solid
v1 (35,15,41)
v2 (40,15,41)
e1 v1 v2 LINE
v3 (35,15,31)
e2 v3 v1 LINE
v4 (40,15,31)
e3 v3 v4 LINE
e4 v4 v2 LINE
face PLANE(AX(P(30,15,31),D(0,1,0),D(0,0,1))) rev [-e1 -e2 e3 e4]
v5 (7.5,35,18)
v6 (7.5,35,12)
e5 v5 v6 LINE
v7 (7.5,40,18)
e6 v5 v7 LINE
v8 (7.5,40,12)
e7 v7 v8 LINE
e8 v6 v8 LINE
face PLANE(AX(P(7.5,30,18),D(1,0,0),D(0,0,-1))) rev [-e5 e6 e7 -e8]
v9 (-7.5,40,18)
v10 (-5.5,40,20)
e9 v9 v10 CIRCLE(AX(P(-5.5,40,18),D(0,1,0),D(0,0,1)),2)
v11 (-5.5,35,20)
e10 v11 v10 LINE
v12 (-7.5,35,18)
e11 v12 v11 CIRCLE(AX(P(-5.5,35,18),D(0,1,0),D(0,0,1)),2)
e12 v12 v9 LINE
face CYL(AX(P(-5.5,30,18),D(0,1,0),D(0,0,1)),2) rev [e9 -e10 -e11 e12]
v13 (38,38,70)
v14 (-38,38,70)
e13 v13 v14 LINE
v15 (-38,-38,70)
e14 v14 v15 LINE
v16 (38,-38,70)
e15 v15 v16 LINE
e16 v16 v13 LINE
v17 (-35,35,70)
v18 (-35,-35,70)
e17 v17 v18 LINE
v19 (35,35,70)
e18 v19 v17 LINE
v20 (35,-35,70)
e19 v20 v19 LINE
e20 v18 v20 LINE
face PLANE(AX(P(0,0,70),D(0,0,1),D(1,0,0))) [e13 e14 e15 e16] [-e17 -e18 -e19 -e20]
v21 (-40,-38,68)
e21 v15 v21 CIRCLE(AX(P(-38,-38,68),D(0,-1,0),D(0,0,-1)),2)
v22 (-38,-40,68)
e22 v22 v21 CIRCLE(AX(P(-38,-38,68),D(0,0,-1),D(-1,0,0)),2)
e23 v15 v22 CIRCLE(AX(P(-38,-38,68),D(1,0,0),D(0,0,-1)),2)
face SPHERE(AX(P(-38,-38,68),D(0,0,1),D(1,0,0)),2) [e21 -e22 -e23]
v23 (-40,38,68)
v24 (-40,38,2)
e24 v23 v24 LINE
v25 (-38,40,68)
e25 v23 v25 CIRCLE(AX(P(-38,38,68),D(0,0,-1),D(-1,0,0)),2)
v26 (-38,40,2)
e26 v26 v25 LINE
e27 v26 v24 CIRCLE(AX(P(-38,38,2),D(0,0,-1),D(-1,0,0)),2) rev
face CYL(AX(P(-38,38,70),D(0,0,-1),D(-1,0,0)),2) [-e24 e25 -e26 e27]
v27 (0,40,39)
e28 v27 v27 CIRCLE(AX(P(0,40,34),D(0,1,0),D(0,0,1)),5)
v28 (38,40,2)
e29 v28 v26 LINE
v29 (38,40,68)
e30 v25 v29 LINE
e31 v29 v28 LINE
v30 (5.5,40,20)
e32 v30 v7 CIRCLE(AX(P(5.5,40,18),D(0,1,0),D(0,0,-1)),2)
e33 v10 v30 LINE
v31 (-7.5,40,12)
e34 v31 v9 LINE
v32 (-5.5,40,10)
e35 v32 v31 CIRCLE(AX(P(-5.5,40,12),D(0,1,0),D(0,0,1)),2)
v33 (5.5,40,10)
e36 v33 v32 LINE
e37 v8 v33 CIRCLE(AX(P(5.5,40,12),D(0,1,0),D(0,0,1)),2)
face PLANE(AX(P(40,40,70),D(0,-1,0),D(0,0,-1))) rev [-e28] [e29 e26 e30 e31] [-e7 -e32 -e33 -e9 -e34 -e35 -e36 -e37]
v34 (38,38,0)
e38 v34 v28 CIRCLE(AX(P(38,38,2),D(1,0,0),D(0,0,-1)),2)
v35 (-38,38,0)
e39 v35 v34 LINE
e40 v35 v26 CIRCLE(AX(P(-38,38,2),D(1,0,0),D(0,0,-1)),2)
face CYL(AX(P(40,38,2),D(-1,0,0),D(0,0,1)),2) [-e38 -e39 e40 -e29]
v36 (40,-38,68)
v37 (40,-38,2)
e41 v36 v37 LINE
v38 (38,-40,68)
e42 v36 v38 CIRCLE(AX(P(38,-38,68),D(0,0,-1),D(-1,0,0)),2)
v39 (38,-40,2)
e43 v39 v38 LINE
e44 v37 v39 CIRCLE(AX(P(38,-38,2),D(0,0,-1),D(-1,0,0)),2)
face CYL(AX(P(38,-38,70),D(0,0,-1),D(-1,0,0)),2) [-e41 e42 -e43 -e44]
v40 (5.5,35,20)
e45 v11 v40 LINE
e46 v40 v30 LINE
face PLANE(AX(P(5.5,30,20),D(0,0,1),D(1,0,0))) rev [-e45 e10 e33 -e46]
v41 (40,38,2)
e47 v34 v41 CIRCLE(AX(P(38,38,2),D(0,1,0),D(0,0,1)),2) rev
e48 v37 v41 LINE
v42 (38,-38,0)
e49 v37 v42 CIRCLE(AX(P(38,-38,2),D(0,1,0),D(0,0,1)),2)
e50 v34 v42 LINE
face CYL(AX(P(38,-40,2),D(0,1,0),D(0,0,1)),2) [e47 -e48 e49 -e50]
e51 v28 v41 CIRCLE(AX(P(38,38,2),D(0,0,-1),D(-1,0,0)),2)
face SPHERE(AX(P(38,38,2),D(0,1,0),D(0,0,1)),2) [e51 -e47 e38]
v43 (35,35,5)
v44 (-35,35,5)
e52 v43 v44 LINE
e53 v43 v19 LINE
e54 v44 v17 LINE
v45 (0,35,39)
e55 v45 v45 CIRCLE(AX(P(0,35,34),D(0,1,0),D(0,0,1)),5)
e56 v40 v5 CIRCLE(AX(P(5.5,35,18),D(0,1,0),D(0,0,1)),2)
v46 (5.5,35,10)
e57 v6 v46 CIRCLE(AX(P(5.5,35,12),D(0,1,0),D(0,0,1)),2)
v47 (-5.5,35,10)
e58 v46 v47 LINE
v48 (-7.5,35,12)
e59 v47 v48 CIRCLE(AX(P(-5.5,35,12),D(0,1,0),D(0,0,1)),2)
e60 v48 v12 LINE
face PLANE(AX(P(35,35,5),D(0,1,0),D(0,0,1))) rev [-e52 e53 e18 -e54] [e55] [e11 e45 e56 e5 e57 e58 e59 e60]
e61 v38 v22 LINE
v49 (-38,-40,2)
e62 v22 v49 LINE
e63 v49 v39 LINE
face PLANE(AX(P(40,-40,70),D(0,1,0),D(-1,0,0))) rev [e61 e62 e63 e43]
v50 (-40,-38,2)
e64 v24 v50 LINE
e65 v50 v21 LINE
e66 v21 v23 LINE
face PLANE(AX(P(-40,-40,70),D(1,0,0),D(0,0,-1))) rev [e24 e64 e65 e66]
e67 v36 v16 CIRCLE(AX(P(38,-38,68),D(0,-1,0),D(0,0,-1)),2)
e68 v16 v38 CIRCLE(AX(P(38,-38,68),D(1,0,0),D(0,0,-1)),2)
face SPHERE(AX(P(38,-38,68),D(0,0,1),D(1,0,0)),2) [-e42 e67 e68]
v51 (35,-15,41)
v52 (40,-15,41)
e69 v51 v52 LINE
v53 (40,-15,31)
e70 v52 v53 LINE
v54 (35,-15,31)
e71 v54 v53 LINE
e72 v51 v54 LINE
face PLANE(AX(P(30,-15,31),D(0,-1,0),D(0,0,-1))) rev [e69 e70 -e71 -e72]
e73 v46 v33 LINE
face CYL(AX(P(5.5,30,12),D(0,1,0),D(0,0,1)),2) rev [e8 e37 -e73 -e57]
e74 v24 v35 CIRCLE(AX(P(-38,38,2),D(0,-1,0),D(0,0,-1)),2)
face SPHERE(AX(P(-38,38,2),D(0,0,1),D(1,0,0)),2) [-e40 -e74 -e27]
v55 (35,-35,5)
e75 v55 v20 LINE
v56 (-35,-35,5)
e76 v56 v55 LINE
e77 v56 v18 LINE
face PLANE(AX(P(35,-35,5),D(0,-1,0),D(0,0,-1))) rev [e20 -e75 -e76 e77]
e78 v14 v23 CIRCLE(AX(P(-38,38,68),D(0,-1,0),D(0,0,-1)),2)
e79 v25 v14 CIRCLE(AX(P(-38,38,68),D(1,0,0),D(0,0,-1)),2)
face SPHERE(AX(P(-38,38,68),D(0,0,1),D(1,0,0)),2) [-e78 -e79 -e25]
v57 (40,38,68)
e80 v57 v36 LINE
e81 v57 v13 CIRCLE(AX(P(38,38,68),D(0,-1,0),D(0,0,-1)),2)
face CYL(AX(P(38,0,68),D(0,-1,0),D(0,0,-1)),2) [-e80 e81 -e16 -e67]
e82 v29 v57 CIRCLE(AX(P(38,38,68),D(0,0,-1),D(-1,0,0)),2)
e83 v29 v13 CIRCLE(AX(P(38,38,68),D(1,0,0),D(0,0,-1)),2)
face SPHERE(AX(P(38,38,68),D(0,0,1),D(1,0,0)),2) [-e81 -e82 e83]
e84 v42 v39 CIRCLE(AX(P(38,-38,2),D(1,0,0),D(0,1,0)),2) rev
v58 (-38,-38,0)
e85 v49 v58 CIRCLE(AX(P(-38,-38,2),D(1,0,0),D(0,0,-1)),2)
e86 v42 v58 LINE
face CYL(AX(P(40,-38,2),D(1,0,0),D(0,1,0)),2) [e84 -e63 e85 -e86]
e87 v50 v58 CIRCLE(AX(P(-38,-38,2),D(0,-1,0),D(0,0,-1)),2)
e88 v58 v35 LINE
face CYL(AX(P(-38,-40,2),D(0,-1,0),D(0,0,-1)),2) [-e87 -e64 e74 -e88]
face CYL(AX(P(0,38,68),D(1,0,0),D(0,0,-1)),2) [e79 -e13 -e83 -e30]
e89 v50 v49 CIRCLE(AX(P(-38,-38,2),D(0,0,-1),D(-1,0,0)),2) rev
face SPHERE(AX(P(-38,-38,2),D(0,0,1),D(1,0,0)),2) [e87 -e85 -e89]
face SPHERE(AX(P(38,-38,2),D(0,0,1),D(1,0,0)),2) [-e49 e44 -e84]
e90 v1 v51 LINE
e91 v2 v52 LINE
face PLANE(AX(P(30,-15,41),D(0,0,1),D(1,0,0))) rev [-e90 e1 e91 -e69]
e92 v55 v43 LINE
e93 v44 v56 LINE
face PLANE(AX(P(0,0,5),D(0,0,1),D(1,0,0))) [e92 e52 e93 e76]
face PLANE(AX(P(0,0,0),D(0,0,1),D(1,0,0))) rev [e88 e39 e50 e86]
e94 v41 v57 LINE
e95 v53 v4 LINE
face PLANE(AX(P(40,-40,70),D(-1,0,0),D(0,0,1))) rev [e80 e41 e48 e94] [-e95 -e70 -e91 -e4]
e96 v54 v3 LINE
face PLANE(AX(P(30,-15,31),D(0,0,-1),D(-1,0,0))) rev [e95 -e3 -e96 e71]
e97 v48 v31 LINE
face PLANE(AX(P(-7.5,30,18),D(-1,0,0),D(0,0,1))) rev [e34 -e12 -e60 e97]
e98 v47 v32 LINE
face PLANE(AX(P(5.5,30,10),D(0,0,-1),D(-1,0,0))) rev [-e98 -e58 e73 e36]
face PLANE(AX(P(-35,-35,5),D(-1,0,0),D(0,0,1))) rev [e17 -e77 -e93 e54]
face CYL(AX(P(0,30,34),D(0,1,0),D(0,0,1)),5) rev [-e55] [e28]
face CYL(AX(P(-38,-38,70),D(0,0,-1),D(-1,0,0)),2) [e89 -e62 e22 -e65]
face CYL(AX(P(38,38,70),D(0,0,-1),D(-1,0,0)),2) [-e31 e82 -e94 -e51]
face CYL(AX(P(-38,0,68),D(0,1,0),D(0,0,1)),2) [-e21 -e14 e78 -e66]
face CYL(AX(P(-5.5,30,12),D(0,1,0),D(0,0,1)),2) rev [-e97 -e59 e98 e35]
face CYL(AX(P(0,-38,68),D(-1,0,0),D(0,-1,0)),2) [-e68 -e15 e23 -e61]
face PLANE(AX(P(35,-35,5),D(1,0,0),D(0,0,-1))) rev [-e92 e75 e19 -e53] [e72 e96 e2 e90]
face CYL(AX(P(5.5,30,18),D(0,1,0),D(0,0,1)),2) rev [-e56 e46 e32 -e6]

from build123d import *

# Parameters (mm, degrees)
SKETCH_1_W          = 80
SKETCH_1_H          = 80
EXTRUDE_1_DEPTH     = 70
SKETCH_2_W          = 70
SKETCH_2_H          = 70
CUT_EXTRUDE_1_DEPTH = 65
FILLET_1_R          = 2
FILLET_2_R          = 2
FILLET_3_R          = 2
CUT_EXTRUDE_3_DEPTH = 10
SKETCH_4_W          = 10
SKETCH_4_H          = 30
CUT_EXTRUDE_4_DEPTH = 10
SKETCH_5_R          = 5
CUT_EXTRUDE_5_DEPTH = 10
FILLET_4_R          = 2


with BuildPart() as part:
    # Эскиз1 → Бобышка-Вытянуть1 (new body)
    with BuildSketch(Plane.XY):
        Rectangle(SKETCH_1_W, SKETCH_1_H)
    extrude(amount=EXTRUDE_1_DEPTH)

    # Эскиз2 → Вырез-Вытянуть1 (cut)
    with BuildSketch(Plane.XY.offset(70)):
        Rectangle(SKETCH_2_W, SKETCH_2_H)
    extrude(amount=-CUT_EXTRUDE_1_DEPTH, mode=Mode.SUBTRACT)

    # Скругление1
    fillet_1_edges = [part.edges().sort_by_distance(p)[0] for p in [
        (-40, 40, 35),
        (-40, -40, 35),
    ]]
    fillet(fillet_1_edges, radius=FILLET_1_R)

    # Скругление2
    fillet_2_edges = [part.edges().sort_by_distance(p)[0] for p in [
        (1, -40, 0),
        (-40, 0, 0),
        (-39.414213562, 39.414213562, 0),
        (-39.414213562, -39.414213562, 0),
        (1, 40, 0),
        (40, 0, 0),
        (40, 40, 35),
    ]]
    fillet(fillet_2_edges, radius=FILLET_2_R)

    # Скругление3
    # the kernel refuses this fillet: 2 mm, written as the material it takes off along each edge
    with BuildSketch(Plane(origin=(38, -38, 2), x_dir=(1, 0, 0), z_dir=(0, -1, 0))) as fillet_3_piece_1_section:
        Polygon((0, 0), (FILLET_3_R, 0), (FILLET_3_R, -FILLET_3_R), (0, -FILLET_3_R), align=None)
    fillet_3_piece_1 = extrude(amount=FILLET_3_R, mode=Mode.PRIVATE)
    fillet_3_piece_1 = fillet_3_piece_1 - Plane(origin=(38, -38, 2), x_dir=(-0.7071067811865475, 0, 0.7071067811865475), z_dir=(0, -1, 0)) * Sphere(FILLET_3_R, mode=Mode.PRIVATE)
    add(fillet_3_piece_1, mode=Mode.SUBTRACT)
    with BuildSketch(Plane(origin=(40, -40, 2), x_dir=(-1, 0, 0), z_dir=(0, 0, 1))) as fillet_3_piece_2:
        with BuildLine():
            CenterArc((FILLET_3_R, -FILLET_3_R), FILLET_3_R, 90, 90)
            Line((0, -FILLET_3_R), (0, 0))
            Line((0, 0), (FILLET_3_R, 0))
        make_face()
    extrude(amount=73, mode=Mode.SUBTRACT)

    # Эскиз3 → Вырез-Вытянуть3 (cut)
    with BuildSketch(Plane(origin=(0, 40, 0), x_dir=(1, 0, 0), z_dir=(0, 1, 0))):
        with BuildLine():
            Line((5.5, -20), (-5.5, -20))
            ThreePointArc((-5.5, -20), (-6.914213562, -19.414213562), (-7.5, -18))
            Line((-7.5, -18), (-7.5, -12))
            ThreePointArc((-7.5, -12), (-6.914213562, -10.585786438), (-5.5, -10))
            Line((-5.5, -10), (5.5, -10))
            ThreePointArc((5.5, -10), (6.914213562, -10.585786438), (7.5, -12))
            Line((7.5, -12), (7.5, -18))
            ThreePointArc((7.5, -18), (6.914213562, -19.414213562), (5.5, -20))
        make_face()
    extrude(amount=-CUT_EXTRUDE_3_DEPTH, mode=Mode.SUBTRACT)

    # Эскиз4 → Вырез-Вытянуть4 (cut)
    with BuildSketch(Plane(origin=(40, 0, 0), x_dir=(0, 0, -1), z_dir=(1, 0, 0))):
        with Locations((-36, 0)):
            Rectangle(SKETCH_4_W, SKETCH_4_H)
    extrude(amount=-CUT_EXTRUDE_4_DEPTH, mode=Mode.SUBTRACT)

    # Эскиз5 → Вырез-Вытянуть5 (cut)
    with BuildSketch(Plane(origin=(0, 40, 0), x_dir=(1, 0, 0), z_dir=(0, 1, 0))):
        with Locations(Location((0, -34, 0), (0, 0, 270))):
            Circle(SKETCH_5_R)
    extrude(amount=-CUT_EXTRUDE_5_DEPTH, mode=Mode.SUBTRACT)

    # Скругление4
    fillet_4_edges = [part.edges().sort_by_distance(p)[0] for p in [
        (0, -40, 70),
        (-40, 0, 70),
        (-39.414213562, 39.414213562, 70),
        (-39.414213562, -39.414213562, 70),
        (0, 40, 70),
        (39.414213562, 39.414213562, 70),
        (40, 0, 70),
        (39.414213562, -39.414213562, 70),
    ]]
    fillet(fillet_4_edges, radius=FILLET_4_R)


solid = part.part
